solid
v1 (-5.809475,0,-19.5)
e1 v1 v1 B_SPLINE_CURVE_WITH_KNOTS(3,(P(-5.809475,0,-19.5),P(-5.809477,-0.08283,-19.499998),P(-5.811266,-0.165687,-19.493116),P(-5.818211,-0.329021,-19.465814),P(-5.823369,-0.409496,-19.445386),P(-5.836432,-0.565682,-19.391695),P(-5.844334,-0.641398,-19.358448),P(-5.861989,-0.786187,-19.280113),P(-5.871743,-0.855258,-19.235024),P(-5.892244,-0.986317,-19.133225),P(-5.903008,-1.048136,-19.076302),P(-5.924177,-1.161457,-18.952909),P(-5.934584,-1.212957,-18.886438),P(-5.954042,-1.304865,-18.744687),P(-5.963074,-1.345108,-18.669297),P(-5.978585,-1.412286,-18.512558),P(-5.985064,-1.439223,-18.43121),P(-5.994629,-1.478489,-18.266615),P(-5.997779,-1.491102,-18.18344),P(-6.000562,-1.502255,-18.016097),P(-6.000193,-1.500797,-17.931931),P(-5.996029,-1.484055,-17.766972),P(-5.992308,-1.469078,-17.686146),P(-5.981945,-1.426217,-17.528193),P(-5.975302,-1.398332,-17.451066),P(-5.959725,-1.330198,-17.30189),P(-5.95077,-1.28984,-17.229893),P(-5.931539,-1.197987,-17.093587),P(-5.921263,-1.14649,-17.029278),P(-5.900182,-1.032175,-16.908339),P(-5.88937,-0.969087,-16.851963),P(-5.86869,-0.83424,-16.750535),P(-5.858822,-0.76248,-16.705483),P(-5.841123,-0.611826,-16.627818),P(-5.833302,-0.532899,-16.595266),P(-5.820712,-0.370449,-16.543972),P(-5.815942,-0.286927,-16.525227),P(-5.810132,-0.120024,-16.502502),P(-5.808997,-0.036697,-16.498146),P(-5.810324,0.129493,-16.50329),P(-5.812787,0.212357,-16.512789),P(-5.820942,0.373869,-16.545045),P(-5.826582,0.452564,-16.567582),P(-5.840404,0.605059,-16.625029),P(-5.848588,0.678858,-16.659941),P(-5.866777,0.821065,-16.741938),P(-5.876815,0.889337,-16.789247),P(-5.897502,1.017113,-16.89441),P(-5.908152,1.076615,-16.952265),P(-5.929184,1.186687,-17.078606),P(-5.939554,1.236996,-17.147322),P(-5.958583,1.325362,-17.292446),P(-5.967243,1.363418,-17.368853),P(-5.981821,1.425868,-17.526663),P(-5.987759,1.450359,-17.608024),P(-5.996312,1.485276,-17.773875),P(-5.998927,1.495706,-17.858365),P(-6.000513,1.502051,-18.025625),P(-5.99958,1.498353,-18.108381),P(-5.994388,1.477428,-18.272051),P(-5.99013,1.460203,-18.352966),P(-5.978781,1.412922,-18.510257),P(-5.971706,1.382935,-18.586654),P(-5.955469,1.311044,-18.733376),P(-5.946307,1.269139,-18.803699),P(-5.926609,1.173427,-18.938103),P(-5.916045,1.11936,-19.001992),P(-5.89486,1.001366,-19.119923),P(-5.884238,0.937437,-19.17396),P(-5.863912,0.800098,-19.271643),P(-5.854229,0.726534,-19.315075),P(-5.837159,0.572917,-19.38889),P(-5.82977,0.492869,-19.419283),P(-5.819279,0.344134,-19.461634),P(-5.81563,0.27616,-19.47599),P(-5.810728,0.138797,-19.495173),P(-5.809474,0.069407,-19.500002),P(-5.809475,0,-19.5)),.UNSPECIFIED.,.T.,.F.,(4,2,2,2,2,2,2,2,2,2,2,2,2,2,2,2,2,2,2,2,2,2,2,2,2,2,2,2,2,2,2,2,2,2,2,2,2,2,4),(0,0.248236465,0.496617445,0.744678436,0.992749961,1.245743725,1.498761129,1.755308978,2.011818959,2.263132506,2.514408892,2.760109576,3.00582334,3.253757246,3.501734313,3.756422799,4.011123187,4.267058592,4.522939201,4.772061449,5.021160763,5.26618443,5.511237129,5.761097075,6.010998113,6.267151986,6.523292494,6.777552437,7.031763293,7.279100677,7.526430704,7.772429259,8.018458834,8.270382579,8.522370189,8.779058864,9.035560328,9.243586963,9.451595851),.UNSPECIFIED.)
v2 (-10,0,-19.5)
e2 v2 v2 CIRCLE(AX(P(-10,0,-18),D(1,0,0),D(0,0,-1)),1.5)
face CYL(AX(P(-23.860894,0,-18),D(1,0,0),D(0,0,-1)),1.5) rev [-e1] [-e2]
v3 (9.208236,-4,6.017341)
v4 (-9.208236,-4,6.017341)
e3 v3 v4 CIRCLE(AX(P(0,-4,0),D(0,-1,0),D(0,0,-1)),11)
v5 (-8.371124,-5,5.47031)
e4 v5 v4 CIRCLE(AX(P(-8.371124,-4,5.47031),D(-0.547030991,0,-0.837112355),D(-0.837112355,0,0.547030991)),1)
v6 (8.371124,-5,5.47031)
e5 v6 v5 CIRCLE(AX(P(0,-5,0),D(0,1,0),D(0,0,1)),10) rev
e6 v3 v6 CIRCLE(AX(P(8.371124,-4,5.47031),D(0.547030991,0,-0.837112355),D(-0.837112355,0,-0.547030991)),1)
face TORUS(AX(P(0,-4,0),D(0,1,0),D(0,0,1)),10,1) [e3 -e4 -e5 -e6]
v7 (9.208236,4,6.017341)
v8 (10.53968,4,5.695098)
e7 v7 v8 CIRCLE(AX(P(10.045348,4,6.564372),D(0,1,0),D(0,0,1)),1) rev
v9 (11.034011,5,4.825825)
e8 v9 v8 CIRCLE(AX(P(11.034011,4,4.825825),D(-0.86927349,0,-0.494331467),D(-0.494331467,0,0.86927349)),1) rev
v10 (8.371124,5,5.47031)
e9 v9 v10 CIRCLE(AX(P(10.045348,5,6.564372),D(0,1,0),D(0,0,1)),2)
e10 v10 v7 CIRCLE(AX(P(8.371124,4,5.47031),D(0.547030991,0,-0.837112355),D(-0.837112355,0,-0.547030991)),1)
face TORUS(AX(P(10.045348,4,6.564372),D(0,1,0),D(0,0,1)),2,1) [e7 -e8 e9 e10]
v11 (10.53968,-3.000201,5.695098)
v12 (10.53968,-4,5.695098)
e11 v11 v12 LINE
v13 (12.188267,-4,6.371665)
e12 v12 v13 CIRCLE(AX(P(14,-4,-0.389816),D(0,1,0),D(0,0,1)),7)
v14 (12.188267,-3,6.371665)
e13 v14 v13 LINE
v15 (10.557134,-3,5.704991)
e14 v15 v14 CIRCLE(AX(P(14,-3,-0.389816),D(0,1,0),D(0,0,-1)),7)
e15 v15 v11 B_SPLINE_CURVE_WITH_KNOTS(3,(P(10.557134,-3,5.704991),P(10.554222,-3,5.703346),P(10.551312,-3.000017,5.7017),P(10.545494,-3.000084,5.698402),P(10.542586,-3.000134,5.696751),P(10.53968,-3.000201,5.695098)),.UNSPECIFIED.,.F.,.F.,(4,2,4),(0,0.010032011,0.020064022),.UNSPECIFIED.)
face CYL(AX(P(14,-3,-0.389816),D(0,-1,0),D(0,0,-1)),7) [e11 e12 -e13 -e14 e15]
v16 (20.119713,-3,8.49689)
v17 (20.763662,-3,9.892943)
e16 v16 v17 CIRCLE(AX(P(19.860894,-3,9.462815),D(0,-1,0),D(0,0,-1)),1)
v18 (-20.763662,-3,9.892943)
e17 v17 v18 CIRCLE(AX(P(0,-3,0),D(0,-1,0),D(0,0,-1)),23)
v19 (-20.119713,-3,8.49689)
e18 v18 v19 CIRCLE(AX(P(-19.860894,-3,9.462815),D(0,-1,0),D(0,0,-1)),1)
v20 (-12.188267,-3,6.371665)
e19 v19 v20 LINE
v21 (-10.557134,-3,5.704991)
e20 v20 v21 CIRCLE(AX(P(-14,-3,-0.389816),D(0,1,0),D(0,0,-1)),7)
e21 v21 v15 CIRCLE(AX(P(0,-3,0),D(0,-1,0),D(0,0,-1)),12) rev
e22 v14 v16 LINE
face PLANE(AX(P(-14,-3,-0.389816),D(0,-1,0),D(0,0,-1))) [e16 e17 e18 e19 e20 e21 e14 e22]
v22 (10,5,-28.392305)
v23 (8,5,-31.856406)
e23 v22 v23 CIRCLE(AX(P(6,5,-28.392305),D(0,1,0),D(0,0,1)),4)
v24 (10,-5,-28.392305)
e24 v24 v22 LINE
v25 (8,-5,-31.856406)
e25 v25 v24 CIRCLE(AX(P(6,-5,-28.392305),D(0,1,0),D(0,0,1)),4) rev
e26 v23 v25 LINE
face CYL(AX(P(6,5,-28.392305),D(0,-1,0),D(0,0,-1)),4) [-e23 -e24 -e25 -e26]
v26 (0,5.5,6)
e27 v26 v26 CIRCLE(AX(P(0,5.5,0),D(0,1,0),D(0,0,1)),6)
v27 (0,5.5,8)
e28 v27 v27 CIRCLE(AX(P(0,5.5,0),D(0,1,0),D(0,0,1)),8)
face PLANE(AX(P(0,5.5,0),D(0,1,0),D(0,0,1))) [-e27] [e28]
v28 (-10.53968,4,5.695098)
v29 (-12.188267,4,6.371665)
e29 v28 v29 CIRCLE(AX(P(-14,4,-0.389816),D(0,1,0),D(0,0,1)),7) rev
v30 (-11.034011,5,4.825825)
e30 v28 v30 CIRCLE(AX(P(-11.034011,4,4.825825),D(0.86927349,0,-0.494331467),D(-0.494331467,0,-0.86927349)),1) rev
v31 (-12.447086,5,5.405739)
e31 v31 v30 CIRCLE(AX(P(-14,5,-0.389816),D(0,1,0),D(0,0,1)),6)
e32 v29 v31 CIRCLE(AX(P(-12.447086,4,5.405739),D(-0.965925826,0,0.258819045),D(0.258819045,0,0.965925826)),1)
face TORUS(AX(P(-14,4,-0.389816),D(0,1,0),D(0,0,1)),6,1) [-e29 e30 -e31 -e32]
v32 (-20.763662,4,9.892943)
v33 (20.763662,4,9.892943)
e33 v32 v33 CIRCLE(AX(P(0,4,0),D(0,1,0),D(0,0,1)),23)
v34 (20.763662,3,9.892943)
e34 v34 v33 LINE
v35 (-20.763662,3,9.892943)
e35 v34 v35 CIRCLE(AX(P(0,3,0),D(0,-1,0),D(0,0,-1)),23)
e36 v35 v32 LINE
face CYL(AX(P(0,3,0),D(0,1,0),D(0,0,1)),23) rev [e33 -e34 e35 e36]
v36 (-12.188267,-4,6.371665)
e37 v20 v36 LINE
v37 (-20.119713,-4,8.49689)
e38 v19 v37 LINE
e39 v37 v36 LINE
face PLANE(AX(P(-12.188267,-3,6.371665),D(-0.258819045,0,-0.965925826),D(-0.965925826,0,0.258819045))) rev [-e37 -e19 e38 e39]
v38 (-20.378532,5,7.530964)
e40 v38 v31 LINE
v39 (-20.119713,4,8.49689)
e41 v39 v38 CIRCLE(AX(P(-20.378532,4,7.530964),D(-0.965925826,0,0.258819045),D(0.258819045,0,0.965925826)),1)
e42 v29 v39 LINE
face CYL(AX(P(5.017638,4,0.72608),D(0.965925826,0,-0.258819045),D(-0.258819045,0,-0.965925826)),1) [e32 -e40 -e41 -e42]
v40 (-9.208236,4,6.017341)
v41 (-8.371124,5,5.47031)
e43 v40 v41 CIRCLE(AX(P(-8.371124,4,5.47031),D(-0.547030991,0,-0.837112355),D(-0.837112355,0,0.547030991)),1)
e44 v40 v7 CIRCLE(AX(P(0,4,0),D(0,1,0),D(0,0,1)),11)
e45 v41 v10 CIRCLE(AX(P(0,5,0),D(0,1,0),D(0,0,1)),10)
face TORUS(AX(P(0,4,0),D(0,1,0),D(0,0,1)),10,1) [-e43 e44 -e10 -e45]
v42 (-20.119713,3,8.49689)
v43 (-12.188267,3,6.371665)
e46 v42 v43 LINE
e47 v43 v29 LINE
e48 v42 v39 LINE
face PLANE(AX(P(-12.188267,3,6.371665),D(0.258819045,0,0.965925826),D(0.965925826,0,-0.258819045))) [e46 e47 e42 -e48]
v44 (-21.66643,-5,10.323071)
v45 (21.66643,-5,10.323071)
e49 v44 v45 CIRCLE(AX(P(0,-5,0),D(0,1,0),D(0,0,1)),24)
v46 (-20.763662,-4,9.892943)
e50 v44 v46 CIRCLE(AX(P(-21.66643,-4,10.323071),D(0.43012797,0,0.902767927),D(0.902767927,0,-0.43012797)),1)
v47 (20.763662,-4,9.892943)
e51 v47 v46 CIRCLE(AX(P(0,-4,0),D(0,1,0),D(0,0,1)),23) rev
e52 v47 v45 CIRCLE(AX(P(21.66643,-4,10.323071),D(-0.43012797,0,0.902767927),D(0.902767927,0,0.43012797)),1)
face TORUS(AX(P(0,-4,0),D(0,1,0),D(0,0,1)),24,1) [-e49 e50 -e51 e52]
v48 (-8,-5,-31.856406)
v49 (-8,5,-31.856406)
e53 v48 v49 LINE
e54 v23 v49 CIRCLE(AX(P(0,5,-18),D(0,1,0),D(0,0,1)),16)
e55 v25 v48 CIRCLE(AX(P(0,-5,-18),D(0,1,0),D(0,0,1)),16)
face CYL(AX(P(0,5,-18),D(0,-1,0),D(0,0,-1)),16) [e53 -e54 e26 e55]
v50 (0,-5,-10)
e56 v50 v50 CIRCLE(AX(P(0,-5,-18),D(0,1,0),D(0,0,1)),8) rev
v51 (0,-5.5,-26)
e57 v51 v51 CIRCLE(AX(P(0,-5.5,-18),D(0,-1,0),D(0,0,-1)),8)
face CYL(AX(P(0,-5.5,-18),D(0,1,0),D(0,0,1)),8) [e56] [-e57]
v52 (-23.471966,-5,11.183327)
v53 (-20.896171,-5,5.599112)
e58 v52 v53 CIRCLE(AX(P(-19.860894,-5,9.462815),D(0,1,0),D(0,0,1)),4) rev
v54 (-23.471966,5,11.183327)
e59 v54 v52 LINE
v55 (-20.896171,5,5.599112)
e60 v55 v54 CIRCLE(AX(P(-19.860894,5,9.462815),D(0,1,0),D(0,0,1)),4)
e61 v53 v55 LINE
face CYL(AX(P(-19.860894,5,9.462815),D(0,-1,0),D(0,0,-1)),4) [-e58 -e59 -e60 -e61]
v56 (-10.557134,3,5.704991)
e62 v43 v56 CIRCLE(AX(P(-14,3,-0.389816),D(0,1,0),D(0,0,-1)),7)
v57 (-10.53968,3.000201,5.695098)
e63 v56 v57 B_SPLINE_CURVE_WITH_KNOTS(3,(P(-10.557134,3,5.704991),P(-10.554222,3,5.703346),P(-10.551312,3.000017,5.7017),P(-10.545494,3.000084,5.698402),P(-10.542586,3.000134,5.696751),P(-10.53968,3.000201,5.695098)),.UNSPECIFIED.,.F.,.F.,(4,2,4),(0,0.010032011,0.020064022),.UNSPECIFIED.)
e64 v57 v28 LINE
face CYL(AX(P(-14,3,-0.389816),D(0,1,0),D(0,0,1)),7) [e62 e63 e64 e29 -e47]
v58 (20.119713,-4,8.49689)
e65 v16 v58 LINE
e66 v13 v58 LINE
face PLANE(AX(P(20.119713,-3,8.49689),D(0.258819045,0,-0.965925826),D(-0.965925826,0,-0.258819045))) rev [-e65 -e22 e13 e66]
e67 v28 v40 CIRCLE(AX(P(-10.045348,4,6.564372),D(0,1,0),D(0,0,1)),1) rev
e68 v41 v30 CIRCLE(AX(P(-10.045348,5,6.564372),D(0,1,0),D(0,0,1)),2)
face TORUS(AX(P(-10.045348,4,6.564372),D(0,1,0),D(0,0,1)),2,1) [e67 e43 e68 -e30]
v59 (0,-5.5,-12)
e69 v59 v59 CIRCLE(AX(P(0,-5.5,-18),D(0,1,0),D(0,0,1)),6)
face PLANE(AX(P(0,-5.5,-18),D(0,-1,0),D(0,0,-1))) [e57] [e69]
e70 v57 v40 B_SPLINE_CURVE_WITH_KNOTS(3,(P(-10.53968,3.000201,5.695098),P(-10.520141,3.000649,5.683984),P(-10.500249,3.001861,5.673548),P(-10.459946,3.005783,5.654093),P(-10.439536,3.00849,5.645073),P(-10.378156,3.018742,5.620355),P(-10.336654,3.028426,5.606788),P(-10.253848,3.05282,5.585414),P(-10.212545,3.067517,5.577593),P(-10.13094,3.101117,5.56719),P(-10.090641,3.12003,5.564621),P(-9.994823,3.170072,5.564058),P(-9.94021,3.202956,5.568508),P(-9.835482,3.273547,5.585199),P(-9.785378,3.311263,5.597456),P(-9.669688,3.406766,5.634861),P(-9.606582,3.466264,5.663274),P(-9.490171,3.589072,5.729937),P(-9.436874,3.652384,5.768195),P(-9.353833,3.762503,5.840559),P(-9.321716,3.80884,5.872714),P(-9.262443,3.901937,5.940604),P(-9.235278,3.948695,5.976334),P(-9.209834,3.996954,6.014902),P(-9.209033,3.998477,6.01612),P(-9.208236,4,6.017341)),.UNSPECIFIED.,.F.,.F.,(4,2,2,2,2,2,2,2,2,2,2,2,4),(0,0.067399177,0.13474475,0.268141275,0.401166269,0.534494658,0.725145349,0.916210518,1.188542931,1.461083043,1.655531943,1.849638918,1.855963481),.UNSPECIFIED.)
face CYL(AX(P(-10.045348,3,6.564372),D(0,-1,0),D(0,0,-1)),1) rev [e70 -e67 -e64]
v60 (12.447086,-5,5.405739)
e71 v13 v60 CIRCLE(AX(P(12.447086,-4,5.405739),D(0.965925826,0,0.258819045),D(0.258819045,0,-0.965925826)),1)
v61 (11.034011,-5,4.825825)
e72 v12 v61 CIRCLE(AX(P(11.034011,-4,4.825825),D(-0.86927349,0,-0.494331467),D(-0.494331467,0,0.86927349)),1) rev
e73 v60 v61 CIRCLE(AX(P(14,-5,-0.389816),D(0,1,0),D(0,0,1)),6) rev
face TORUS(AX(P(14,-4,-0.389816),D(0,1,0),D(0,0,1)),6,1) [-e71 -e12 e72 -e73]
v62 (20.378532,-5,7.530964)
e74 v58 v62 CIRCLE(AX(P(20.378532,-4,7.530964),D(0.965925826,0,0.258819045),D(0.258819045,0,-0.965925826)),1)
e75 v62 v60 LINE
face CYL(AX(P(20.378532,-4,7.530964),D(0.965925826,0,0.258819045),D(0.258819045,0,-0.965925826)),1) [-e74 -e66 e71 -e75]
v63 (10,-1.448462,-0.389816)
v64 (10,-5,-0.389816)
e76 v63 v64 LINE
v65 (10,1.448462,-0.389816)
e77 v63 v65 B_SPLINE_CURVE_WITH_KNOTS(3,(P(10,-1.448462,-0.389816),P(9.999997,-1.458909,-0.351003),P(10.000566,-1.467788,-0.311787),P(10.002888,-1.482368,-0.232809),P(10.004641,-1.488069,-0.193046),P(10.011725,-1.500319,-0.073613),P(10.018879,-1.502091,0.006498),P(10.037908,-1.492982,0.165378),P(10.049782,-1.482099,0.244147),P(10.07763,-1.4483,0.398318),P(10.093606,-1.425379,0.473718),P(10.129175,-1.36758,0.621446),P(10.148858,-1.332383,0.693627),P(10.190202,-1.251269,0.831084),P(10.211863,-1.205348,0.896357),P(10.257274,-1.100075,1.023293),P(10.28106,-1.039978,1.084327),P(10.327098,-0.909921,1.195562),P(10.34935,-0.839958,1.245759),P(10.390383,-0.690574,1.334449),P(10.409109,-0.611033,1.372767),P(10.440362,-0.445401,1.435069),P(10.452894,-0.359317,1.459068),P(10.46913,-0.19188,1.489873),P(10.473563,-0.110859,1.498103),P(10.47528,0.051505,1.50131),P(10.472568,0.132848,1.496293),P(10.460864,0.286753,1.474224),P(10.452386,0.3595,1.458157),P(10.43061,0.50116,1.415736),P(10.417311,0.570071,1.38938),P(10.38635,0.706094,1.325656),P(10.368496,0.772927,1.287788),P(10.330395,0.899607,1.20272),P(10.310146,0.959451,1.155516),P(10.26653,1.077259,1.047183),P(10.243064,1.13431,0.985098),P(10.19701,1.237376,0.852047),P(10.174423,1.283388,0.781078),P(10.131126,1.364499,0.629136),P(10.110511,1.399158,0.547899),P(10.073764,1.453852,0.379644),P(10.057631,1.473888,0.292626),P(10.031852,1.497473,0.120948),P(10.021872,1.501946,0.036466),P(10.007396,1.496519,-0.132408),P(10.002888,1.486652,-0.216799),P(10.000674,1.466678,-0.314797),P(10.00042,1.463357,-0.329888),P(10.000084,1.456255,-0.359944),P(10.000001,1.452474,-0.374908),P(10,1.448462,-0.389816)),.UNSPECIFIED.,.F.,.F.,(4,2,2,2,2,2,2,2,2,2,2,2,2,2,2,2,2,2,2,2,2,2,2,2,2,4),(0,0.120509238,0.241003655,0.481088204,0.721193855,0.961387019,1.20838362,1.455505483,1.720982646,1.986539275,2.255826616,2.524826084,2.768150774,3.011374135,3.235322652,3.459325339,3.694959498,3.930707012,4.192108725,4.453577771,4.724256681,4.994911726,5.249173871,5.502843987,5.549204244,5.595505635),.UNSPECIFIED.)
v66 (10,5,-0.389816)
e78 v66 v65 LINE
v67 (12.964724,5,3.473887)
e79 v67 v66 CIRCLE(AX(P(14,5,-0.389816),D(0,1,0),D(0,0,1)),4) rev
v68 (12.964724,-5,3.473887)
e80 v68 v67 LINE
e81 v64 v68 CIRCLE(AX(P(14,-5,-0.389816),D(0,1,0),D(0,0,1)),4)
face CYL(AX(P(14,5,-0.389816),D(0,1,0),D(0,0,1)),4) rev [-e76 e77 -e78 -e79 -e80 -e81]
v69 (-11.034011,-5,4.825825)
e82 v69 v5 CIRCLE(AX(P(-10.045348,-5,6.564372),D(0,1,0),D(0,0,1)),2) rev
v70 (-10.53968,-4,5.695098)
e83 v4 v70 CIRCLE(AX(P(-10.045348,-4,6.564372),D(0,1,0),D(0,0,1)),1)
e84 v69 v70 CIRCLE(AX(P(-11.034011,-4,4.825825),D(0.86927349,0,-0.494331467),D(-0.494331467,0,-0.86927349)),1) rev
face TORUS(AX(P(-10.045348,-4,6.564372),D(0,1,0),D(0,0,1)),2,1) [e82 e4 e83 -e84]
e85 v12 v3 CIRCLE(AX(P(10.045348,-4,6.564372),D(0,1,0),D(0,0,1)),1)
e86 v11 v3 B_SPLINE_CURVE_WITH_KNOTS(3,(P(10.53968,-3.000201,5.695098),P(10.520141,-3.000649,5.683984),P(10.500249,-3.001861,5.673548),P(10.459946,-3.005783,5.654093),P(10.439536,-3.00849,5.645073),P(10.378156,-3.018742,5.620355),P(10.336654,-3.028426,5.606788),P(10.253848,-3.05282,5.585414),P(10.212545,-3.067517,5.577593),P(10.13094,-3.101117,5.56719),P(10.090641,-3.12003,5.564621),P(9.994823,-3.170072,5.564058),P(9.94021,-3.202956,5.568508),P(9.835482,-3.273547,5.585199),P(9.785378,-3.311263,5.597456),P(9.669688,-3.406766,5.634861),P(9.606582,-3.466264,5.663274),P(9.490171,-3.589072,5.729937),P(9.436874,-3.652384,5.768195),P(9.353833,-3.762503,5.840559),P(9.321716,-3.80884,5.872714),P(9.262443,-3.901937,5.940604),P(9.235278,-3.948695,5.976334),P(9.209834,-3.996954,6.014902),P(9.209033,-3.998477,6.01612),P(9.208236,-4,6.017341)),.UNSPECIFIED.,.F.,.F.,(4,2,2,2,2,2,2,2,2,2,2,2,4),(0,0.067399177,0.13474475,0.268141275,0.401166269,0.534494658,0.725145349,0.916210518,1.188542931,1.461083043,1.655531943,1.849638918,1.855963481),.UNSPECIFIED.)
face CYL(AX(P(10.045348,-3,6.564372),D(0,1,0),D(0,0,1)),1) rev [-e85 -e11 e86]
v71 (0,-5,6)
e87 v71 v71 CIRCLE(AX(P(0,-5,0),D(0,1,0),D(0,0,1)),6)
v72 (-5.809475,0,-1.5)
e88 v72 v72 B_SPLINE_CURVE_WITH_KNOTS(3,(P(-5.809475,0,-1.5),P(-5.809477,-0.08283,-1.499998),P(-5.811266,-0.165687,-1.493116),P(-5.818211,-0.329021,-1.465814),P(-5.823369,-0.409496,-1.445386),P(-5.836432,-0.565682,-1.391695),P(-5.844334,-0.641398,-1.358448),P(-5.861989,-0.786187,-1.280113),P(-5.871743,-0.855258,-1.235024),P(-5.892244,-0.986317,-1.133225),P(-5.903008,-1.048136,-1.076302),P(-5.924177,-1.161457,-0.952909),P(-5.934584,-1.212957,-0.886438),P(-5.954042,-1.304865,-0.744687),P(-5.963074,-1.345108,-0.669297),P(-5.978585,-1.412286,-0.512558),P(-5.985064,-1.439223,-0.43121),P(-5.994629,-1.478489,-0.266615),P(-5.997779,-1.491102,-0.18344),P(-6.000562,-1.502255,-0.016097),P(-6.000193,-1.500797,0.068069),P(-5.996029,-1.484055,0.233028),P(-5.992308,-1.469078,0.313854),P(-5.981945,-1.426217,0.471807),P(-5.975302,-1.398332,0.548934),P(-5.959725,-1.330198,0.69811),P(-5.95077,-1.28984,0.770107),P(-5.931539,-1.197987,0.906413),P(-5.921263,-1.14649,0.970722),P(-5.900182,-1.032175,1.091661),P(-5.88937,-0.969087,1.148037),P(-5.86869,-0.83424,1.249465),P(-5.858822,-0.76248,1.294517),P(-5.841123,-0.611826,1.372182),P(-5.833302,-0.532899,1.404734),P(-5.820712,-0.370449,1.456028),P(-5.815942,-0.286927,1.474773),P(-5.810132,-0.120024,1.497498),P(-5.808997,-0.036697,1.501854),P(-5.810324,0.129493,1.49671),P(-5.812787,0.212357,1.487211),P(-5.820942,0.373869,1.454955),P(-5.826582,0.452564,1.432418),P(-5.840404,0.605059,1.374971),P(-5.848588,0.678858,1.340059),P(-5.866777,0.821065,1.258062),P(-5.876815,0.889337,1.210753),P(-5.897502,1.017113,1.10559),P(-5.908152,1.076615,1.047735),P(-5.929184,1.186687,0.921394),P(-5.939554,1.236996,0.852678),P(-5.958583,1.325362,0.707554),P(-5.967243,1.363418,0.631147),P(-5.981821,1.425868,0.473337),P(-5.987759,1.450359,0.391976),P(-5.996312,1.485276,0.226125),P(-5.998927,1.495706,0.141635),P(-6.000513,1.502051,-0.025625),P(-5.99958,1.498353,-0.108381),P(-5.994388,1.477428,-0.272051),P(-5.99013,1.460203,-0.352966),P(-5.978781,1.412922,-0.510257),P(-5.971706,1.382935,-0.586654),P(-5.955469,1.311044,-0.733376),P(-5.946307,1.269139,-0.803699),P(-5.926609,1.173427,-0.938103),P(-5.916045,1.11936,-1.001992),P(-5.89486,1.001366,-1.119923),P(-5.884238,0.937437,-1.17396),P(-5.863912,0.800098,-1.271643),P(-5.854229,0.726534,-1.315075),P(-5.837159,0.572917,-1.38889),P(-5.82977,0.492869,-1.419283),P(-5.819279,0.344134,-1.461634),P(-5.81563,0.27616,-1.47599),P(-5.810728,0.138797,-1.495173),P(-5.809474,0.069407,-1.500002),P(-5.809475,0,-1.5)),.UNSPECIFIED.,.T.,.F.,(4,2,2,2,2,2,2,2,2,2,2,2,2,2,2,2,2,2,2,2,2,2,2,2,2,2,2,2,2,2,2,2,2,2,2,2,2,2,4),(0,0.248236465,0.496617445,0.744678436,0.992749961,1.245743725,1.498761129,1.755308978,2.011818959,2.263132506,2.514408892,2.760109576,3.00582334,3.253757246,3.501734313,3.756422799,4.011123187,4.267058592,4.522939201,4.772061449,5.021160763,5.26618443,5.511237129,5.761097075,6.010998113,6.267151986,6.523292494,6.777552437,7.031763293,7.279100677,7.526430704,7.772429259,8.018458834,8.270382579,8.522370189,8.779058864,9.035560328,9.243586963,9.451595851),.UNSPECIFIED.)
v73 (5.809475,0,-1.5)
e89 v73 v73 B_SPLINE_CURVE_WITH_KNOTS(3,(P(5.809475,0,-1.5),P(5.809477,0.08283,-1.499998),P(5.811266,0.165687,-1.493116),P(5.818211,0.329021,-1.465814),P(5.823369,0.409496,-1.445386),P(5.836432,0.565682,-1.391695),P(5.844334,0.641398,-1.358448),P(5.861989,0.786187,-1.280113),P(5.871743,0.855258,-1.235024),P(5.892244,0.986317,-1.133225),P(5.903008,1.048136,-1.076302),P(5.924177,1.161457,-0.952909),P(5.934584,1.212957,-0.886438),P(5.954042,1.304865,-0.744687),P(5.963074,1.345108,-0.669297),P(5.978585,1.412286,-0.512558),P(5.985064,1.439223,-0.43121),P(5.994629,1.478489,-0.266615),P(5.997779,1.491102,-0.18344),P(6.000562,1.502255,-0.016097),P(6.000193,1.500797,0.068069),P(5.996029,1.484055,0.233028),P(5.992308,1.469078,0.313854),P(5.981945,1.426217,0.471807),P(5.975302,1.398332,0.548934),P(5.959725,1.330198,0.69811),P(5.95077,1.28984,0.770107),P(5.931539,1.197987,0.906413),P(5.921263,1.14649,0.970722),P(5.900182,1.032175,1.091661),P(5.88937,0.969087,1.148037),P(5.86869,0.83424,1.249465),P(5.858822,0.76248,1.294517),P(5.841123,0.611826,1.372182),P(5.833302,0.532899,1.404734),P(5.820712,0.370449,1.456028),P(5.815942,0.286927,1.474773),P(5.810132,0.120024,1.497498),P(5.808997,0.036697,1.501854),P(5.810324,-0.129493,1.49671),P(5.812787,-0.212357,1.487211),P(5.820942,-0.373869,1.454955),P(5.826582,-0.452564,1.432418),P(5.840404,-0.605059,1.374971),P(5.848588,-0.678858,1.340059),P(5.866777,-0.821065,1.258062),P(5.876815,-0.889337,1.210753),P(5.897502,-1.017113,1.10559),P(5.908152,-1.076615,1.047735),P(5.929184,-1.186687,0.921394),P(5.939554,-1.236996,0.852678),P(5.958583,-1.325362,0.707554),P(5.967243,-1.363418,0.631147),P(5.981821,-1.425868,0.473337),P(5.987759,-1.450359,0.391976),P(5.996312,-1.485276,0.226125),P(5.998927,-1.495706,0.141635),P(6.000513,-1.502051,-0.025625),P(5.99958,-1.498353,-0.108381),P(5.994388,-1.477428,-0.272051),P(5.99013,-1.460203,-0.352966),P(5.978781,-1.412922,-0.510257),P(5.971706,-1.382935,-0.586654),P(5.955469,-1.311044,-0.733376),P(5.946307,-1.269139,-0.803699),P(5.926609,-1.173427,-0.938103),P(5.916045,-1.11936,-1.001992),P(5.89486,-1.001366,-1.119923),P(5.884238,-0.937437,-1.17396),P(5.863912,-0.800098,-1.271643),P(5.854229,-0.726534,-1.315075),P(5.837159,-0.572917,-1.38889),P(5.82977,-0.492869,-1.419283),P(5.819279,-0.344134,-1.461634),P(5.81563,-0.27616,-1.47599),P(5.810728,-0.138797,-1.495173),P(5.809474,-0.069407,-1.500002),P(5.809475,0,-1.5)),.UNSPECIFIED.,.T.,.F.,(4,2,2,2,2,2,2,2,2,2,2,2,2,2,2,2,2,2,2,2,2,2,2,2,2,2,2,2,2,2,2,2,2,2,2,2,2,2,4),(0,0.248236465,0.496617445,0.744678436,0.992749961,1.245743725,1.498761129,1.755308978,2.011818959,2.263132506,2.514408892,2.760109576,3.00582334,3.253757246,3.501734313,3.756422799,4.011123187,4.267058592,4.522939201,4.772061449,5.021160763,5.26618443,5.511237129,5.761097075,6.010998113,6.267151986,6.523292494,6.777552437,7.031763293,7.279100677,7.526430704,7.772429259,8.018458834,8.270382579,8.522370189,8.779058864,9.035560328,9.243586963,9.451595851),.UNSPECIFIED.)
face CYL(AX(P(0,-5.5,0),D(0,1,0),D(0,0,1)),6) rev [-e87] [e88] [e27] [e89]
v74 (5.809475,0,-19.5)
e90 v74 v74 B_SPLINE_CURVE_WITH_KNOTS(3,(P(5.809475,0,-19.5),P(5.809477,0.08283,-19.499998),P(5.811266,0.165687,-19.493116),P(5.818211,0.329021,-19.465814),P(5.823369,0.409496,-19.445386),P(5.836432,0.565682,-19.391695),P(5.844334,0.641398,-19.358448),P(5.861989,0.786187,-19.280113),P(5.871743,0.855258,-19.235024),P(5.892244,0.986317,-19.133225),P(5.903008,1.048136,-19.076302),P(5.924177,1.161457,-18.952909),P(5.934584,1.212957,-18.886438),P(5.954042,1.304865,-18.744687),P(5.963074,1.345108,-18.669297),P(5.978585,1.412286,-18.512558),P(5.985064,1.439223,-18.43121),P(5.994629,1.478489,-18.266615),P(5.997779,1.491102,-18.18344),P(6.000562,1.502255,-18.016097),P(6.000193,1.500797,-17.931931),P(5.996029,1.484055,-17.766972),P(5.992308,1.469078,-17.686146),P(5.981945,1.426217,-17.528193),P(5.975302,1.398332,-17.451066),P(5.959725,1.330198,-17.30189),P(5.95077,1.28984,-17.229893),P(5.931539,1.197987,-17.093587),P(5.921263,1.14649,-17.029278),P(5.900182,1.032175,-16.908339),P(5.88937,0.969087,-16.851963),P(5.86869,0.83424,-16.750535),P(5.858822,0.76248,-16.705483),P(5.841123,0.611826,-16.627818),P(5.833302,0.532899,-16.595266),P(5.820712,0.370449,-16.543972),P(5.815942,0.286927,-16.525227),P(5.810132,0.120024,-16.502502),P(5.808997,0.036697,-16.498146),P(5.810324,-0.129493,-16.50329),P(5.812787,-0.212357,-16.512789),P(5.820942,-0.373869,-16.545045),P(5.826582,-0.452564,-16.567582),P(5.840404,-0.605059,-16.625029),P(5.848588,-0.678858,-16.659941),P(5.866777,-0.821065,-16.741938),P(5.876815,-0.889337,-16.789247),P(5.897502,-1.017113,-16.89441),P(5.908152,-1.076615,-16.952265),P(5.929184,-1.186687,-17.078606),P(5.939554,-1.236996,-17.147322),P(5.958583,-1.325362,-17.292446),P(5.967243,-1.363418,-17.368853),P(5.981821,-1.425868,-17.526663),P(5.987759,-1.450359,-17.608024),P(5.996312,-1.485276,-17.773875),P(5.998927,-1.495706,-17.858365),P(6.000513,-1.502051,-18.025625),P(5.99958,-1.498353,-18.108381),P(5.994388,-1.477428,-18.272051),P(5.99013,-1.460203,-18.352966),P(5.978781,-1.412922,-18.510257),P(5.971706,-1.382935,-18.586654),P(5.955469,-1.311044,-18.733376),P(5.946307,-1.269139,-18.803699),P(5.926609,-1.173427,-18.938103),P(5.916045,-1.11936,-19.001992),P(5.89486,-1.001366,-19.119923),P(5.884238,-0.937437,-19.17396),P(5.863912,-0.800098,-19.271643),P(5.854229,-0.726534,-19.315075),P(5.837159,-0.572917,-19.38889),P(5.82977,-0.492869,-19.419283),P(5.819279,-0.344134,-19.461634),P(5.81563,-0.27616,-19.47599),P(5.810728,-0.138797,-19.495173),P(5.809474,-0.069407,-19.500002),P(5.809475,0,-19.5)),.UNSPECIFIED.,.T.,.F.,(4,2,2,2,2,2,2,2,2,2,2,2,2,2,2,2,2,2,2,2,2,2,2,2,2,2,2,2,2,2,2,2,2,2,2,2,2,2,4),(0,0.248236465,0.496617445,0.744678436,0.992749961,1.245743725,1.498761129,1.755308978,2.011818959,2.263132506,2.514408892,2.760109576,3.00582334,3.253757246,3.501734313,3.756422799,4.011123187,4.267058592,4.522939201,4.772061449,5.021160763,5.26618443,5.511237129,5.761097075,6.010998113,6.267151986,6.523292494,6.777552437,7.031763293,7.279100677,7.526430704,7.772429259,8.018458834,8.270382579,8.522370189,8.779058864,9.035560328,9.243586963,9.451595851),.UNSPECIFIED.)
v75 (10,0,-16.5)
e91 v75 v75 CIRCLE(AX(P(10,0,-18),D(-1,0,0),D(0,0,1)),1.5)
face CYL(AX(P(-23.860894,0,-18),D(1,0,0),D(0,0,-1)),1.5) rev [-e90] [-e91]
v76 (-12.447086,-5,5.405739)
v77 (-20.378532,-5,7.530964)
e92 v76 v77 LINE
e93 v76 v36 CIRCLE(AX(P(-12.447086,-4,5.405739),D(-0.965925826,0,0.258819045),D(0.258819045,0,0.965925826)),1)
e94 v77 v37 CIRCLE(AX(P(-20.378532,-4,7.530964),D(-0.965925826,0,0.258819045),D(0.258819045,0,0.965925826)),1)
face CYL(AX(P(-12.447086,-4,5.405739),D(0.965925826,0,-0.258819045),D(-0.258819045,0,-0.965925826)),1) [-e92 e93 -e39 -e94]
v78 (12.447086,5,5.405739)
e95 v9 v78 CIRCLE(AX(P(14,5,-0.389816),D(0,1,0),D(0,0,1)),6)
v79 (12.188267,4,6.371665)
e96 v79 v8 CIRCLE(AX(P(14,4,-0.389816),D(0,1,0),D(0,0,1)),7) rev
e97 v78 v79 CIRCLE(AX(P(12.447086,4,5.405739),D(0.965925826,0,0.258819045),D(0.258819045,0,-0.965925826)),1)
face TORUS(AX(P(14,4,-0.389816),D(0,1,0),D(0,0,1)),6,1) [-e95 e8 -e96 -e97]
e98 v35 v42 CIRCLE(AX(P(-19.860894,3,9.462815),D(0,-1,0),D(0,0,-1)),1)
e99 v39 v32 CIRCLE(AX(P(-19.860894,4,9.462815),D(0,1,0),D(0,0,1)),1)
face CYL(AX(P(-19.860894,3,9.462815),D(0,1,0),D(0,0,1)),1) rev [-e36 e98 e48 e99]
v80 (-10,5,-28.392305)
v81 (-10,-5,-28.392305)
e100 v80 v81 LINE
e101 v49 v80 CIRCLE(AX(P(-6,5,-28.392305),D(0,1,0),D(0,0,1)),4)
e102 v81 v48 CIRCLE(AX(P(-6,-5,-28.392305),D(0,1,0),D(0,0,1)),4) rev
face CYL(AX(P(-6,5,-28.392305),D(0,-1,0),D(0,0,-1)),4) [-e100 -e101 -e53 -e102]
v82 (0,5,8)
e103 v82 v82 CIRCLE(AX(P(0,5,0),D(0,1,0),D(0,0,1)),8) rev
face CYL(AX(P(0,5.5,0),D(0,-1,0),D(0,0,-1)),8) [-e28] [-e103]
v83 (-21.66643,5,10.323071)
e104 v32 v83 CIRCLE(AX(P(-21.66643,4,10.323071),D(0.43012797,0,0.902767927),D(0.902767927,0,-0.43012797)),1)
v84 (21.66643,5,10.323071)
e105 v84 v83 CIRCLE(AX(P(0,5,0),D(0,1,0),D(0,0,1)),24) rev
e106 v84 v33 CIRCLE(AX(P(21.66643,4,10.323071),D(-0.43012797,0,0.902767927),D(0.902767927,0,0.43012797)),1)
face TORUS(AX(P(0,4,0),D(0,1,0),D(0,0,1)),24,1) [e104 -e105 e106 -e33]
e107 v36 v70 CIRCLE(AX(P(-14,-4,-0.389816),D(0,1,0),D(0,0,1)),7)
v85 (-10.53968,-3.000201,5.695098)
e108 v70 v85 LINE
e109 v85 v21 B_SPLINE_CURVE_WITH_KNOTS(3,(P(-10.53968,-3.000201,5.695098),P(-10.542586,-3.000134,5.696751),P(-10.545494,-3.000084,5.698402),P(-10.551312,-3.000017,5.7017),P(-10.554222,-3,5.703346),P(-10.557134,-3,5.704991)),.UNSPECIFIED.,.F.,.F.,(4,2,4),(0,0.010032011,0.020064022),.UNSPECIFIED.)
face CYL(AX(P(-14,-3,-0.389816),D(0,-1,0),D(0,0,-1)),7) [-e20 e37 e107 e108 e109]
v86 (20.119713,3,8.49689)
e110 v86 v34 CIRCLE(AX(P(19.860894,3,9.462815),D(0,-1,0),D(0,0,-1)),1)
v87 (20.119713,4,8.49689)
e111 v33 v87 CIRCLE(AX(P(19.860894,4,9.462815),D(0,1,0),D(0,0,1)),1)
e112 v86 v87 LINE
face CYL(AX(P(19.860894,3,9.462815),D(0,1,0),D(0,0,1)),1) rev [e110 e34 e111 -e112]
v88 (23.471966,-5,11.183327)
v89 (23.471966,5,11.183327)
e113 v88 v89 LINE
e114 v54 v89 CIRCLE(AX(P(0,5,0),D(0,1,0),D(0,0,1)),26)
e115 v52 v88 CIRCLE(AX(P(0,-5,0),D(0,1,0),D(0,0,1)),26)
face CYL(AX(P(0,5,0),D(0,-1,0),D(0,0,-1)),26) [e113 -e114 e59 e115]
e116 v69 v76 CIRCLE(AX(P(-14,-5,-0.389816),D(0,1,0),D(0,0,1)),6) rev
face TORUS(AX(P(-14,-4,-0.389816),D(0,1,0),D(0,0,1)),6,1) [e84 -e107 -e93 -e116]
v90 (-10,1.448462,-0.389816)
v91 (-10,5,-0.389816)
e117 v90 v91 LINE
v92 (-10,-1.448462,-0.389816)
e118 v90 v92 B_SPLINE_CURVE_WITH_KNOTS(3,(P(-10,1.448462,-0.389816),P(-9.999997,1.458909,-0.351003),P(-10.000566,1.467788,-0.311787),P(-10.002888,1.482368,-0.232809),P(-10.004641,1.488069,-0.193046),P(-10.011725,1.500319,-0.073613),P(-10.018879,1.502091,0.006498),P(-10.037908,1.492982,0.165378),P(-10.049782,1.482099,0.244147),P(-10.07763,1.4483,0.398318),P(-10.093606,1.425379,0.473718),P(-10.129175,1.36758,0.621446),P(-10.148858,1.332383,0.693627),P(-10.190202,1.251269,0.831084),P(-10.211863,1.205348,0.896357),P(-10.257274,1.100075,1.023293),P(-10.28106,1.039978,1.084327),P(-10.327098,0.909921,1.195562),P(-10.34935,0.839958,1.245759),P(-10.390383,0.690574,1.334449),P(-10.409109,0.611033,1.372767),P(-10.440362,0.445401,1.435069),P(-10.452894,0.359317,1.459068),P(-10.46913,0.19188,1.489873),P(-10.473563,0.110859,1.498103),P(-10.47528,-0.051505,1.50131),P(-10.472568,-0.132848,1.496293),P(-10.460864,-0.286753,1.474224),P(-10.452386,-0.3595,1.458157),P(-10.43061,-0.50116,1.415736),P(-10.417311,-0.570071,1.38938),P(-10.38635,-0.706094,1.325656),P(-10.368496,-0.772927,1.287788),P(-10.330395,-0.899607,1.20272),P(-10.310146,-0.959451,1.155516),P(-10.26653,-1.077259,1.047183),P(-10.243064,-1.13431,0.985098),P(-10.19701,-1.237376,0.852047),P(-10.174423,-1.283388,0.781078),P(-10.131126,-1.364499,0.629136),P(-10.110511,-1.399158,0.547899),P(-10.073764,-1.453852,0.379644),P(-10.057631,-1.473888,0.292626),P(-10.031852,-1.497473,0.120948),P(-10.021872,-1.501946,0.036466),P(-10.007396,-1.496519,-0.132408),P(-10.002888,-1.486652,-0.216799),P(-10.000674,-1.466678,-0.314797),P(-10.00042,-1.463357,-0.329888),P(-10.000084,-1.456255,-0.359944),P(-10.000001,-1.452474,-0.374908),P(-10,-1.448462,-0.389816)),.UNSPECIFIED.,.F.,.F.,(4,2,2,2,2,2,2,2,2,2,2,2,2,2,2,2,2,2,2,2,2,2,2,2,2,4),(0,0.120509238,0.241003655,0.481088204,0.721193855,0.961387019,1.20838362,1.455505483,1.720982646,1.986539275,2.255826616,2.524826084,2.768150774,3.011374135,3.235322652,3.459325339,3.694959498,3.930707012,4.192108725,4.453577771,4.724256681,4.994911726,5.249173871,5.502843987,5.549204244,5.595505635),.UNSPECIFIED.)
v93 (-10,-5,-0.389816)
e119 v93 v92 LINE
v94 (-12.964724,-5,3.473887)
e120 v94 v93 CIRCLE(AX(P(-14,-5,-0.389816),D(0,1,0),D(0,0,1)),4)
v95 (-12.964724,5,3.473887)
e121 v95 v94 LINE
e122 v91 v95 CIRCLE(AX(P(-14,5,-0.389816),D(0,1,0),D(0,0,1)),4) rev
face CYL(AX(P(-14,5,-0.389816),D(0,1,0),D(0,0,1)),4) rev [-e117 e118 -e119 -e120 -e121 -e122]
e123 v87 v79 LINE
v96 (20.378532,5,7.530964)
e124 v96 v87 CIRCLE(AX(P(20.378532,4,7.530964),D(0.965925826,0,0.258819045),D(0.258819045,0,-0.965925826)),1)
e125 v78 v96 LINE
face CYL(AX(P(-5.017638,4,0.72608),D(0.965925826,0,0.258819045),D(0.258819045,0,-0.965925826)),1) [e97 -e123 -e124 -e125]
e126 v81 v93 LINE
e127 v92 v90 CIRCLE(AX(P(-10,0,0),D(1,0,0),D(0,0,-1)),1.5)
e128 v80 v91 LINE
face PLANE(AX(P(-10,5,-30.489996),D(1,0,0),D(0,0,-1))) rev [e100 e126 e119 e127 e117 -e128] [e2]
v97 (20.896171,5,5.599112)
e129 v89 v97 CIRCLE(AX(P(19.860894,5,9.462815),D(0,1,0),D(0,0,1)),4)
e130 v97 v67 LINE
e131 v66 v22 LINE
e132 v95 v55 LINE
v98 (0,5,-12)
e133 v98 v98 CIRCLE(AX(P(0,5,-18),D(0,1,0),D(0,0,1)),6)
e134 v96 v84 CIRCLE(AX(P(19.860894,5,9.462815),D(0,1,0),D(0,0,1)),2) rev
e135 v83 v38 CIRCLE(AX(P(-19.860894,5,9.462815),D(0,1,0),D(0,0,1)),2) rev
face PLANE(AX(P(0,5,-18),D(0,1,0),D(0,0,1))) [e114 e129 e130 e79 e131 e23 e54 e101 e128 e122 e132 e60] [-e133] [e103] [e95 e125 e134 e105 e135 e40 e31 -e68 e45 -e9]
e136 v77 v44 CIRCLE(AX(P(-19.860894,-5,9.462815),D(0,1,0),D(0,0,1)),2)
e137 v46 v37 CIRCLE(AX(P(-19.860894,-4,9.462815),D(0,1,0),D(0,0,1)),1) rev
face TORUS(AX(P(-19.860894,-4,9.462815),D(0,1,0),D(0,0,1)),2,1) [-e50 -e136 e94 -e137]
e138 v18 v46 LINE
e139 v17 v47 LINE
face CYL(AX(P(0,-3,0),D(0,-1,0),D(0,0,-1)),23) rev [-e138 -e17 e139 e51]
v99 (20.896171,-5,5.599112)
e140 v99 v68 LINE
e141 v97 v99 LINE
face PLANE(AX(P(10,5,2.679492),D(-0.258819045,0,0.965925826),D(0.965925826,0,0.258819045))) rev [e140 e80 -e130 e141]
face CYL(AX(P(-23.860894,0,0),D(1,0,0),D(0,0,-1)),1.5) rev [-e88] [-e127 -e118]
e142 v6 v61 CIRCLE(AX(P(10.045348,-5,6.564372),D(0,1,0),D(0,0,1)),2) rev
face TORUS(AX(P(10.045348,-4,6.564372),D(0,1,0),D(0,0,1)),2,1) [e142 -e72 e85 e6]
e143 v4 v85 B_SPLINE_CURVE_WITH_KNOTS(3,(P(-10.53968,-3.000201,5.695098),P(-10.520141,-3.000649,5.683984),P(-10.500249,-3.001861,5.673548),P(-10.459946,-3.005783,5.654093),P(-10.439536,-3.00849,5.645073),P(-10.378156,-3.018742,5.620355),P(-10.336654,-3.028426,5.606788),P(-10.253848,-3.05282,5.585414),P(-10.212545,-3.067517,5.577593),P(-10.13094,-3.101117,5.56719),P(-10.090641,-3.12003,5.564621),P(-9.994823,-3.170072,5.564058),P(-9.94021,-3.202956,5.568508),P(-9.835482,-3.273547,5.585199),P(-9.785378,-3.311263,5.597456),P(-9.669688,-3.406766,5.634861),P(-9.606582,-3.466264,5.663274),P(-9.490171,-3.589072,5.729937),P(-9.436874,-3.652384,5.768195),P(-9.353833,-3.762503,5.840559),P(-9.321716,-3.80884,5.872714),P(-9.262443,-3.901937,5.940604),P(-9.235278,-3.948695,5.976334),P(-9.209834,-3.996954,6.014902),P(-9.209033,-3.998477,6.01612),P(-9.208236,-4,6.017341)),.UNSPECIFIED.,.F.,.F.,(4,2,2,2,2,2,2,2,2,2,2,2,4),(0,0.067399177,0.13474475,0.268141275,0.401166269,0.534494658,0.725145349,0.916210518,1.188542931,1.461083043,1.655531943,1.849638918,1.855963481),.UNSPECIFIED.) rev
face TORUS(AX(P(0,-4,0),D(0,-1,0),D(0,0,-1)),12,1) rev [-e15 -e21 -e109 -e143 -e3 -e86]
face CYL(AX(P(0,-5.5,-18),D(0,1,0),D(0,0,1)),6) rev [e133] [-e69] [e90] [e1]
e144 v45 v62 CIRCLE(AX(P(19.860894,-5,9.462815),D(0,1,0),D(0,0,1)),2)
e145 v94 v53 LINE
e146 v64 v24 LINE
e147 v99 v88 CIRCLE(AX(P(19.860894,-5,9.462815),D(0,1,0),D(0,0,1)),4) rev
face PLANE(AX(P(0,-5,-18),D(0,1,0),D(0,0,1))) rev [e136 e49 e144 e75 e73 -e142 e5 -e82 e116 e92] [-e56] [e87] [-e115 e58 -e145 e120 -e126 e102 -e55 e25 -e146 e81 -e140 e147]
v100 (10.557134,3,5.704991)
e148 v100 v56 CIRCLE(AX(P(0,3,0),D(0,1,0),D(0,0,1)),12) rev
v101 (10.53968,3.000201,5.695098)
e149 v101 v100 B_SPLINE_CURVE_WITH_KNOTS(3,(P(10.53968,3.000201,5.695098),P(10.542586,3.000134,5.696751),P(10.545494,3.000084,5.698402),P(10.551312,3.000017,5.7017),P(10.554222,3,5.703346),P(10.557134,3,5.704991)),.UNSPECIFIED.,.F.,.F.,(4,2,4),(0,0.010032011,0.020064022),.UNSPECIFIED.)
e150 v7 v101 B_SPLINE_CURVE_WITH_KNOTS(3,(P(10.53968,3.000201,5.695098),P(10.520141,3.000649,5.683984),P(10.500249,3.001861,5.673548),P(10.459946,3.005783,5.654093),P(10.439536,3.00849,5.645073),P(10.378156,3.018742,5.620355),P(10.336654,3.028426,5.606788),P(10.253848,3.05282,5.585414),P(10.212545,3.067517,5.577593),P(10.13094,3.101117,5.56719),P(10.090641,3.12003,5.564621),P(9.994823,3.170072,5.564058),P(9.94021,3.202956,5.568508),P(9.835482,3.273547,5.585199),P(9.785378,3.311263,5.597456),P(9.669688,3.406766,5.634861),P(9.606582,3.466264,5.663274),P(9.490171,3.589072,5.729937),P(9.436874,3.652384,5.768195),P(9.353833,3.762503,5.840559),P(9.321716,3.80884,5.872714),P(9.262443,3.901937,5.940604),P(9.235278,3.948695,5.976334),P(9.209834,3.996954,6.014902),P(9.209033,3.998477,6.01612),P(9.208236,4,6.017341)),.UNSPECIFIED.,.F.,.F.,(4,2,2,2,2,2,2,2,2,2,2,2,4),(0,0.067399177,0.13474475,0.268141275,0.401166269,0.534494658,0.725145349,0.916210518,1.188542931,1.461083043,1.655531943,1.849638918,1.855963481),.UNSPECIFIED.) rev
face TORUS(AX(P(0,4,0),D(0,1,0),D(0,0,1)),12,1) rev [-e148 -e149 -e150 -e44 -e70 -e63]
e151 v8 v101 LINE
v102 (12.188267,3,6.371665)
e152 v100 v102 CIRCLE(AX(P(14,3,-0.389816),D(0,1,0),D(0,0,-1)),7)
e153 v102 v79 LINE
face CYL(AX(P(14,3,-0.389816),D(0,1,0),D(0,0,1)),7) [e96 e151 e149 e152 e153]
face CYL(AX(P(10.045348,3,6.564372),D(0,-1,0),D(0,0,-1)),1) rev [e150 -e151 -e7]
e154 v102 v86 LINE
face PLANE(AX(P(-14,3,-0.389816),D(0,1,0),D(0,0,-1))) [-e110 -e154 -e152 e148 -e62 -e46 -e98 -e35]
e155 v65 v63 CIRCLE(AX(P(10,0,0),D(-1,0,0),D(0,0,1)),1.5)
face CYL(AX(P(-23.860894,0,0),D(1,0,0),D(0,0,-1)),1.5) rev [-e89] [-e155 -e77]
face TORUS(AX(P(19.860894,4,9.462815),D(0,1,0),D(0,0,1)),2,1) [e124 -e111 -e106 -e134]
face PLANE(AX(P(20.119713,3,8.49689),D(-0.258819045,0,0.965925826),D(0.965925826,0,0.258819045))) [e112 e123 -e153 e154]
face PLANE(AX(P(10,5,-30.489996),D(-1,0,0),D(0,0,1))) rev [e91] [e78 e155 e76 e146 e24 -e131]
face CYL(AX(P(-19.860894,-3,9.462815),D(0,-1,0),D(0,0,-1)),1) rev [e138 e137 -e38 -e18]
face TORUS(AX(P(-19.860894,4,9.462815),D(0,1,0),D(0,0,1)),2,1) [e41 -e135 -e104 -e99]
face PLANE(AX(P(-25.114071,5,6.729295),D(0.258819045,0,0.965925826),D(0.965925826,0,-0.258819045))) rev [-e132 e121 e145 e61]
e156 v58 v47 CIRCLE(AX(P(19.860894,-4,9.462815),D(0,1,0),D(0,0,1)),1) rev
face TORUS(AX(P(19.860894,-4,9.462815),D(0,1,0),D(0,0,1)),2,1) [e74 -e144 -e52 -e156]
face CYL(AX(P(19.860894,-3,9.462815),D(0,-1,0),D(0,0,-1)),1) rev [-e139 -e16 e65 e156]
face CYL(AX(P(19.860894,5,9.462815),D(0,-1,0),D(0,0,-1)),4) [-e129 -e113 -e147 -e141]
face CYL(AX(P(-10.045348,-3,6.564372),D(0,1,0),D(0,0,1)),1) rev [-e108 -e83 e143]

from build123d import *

# Parameters (mm, degrees)
BOSS_EXTRUDE1_DEPTH     = 5
FILLET1_R               = 4
SKETCH3_R               = 8
BOSS_EXTRUDE2_DEPTH     = 0.5
SKETCH4_R               = 8
BOSS_EXTRUDE3_DEPTH     = 0.5
SKETCH5_R               = 6
CUT_EXTRUDE2_DEPTH      = 43.969085178
CUT_EXTRUDE3_DEPTH      = 2
FILLET4_R               = 1
FILLET4_OF_MIRROR1_R    = 1
CUT_EXTRUDE4_DEPTH      = 42.899788556
CUT_EXTRUDE4_DEPTH_BACK = 42.899788556
SKETCH7_R               = 1.5


with BuildPart() as part:
    # Sketch1 → Boss-Extrude1 (new, symmetric)
    with BuildSketch(Plane(origin=(0, 0, 0), x_dir=(1, 0, 0), z_dir=(0, 1, 0))):
        with BuildLine():
            Line((-10, 30.489995997), (-10, -2.679491924))
            Line((-10, -2.679491924), (-25.114071484, -6.729295173))
            ThreePointArc((-25.114071484, -6.729295173), (0, -26), (25.114071484, -6.729295173))
            Line((25.114071484, -6.729295173), (10, -2.679491924))
            Line((10, -2.679491924), (10, 30.489995997))
            ThreePointArc((10, 30.489995997), (0, 34), (-10, 30.489995997))
        make_face()
    extrude(amount=BOSS_EXTRUDE1_DEPTH, both=True)

    # Fillet1
    fillet1_edges = [part.edges().sort_by_distance(p)[0] for p in [
        (10, 0, -30.489995997),
        (10, 0, 2.679491924),
        (25.114071484, 0, 6.729295173),
        (-25.114071484, 0, 6.729295173),
        (-10, 0, 2.679491924),
        (-10, 0, -30.489995997),
    ]]
    fillet(fillet1_edges, radius=FILLET1_R)

    # Sketch3 → Boss-Extrude2 (add, symmetric)
    with BuildSketch(Plane(origin=(0, 5, 0), x_dir=(1, 0, 0), z_dir=(0, 1, 0))):
        with Locations(Location((0, 0, 0), (0, 0, 270))):
            Circle(SKETCH3_R)
    extrude(amount=BOSS_EXTRUDE2_DEPTH, both=True)

    # Sketch4 → Boss-Extrude3 (add, symmetric)
    with BuildSketch(Plane.XZ.offset(5)):
        with Locations(Location((0, -18, 0), (0, 0, 90))):
            Circle(SKETCH4_R)
    extrude(amount=BOSS_EXTRUDE3_DEPTH, both=True)

    # Sketch5 → Cut-Extrude2 (cut, through all)
    with BuildSketch(Plane(origin=(0, 5.5, 0), x_dir=(1, 0, 0), z_dir=(0, 1, 0))):
        with Locations(Location((0, 0, 0), (0, 0, 270))):
            Circle(SKETCH5_R)
        with Locations(Location((0, 18, 0), (0, 0, 270))):
            Circle(SKETCH5_R)
    extrude(amount=-CUT_EXTRUDE2_DEPTH, mode=Mode.SUBTRACT)

    # Sketch6 → Cut-Extrude3 (cut)
    with BuildSketch(Plane.XZ.offset(5)):
        with BuildLine():
            Line((20.119713435, 8.496889508), (12.188266684, 6.371664756))
            ThreePointArc((12.188266684, 6.371664756), (10.893551196, 5.883139881), (9.720237296, 5.14946472))
            ThreePointArc((9.720237296, 5.14946472), (0, 11), (-9.720237296, 5.14946472))
            ThreePointArc((-9.720237296, 5.14946472), (-10.893551196, 5.883139881), (-12.188266684, 6.371664756))
            Line((-12.188266684, 6.371664756), (-20.119713435, 8.496889508))
            ThreePointArc((-20.119713435, 8.496889508), (-20.768948696, 9.043962883), (-20.763662316, 9.892943304))
            ThreePointArc((-20.763662316, 9.892943304), (0, 23), (20.763662316, 9.892943304))
            ThreePointArc((20.763662316, 9.892943304), (20.768948696, 9.043962883), (20.119713435, 8.496889508))
        make_face()
    cut_extrude3 = extrude(amount=-CUT_EXTRUDE3_DEPTH, mode=Mode.SUBTRACT)

    # Fillet4
    fillet4_edges = [part.edges().sort_by_distance(p)[0] for p in [
        (-9.720237296, -4, 5.14946472),
        (0, -3, 11),
        (9.720237296, -4, 5.14946472),
        (-10.893551196, -5, 5.883139881),
        (0, -5, 11),
        (10.893551196, -5, 5.883139881),
        (16.153990059, -5, 7.434277132),
        (20.768948696, -5, 9.043962883),
        (0, -5, 23),
        (-20.768948696, -5, 9.043962883),
        (-16.153990059, -5, 7.434277132),
    ]]
    fillet(fillet4_edges, radius=FILLET4_R - 0.0001)  # a hair under: the kernel refuses the full size

    # Mirror1: Cut-Extrude3 across plane
    add(cut_extrude3.mirror(Plane.ZX), mode=Mode.SUBTRACT)

    # Fillet4 of Mirror1
    fillet4_of_mirror1_edges = [part.edges().sort_by_distance(p)[0] for p in [
        (-9.720237296, 4, 5.14946472),
        (0, 3, 11),
        (9.720237296, 4, 5.14946472),
        (-10.893551196, 5, 5.883139881),
        (0, 5, 11),
        (10.893551196, 5, 5.883139881),
        (16.153990059, 5, 7.434277132),
        (20.768948696, 5, 9.043962883),
        (0, 5, 23),
        (-20.768948696, 5, 9.043962883),
        (-16.153990059, 5, 7.434277132),
    ]]
    fillet(fillet4_of_mirror1_edges, radius=FILLET4_OF_MIRROR1_R - 0.0001)  # a hair under: the kernel refuses the full size

    # Sketch7 → Cut-Extrude4 (cut, two sides: drawn at the far end of the back side and taken through both)
    with BuildSketch(Plane(origin=(0, 0, 0), x_dir=(0, 0, -1), z_dir=(1, 0, 0)).offset(-CUT_EXTRUDE4_DEPTH_BACK)):
        Circle(SKETCH7_R)
        with Locations((18, 0)):
            Circle(SKETCH7_R)
    extrude(amount=CUT_EXTRUDE4_DEPTH + CUT_EXTRUDE4_DEPTH_BACK, mode=Mode.SUBTRACT)


solid = part.part
